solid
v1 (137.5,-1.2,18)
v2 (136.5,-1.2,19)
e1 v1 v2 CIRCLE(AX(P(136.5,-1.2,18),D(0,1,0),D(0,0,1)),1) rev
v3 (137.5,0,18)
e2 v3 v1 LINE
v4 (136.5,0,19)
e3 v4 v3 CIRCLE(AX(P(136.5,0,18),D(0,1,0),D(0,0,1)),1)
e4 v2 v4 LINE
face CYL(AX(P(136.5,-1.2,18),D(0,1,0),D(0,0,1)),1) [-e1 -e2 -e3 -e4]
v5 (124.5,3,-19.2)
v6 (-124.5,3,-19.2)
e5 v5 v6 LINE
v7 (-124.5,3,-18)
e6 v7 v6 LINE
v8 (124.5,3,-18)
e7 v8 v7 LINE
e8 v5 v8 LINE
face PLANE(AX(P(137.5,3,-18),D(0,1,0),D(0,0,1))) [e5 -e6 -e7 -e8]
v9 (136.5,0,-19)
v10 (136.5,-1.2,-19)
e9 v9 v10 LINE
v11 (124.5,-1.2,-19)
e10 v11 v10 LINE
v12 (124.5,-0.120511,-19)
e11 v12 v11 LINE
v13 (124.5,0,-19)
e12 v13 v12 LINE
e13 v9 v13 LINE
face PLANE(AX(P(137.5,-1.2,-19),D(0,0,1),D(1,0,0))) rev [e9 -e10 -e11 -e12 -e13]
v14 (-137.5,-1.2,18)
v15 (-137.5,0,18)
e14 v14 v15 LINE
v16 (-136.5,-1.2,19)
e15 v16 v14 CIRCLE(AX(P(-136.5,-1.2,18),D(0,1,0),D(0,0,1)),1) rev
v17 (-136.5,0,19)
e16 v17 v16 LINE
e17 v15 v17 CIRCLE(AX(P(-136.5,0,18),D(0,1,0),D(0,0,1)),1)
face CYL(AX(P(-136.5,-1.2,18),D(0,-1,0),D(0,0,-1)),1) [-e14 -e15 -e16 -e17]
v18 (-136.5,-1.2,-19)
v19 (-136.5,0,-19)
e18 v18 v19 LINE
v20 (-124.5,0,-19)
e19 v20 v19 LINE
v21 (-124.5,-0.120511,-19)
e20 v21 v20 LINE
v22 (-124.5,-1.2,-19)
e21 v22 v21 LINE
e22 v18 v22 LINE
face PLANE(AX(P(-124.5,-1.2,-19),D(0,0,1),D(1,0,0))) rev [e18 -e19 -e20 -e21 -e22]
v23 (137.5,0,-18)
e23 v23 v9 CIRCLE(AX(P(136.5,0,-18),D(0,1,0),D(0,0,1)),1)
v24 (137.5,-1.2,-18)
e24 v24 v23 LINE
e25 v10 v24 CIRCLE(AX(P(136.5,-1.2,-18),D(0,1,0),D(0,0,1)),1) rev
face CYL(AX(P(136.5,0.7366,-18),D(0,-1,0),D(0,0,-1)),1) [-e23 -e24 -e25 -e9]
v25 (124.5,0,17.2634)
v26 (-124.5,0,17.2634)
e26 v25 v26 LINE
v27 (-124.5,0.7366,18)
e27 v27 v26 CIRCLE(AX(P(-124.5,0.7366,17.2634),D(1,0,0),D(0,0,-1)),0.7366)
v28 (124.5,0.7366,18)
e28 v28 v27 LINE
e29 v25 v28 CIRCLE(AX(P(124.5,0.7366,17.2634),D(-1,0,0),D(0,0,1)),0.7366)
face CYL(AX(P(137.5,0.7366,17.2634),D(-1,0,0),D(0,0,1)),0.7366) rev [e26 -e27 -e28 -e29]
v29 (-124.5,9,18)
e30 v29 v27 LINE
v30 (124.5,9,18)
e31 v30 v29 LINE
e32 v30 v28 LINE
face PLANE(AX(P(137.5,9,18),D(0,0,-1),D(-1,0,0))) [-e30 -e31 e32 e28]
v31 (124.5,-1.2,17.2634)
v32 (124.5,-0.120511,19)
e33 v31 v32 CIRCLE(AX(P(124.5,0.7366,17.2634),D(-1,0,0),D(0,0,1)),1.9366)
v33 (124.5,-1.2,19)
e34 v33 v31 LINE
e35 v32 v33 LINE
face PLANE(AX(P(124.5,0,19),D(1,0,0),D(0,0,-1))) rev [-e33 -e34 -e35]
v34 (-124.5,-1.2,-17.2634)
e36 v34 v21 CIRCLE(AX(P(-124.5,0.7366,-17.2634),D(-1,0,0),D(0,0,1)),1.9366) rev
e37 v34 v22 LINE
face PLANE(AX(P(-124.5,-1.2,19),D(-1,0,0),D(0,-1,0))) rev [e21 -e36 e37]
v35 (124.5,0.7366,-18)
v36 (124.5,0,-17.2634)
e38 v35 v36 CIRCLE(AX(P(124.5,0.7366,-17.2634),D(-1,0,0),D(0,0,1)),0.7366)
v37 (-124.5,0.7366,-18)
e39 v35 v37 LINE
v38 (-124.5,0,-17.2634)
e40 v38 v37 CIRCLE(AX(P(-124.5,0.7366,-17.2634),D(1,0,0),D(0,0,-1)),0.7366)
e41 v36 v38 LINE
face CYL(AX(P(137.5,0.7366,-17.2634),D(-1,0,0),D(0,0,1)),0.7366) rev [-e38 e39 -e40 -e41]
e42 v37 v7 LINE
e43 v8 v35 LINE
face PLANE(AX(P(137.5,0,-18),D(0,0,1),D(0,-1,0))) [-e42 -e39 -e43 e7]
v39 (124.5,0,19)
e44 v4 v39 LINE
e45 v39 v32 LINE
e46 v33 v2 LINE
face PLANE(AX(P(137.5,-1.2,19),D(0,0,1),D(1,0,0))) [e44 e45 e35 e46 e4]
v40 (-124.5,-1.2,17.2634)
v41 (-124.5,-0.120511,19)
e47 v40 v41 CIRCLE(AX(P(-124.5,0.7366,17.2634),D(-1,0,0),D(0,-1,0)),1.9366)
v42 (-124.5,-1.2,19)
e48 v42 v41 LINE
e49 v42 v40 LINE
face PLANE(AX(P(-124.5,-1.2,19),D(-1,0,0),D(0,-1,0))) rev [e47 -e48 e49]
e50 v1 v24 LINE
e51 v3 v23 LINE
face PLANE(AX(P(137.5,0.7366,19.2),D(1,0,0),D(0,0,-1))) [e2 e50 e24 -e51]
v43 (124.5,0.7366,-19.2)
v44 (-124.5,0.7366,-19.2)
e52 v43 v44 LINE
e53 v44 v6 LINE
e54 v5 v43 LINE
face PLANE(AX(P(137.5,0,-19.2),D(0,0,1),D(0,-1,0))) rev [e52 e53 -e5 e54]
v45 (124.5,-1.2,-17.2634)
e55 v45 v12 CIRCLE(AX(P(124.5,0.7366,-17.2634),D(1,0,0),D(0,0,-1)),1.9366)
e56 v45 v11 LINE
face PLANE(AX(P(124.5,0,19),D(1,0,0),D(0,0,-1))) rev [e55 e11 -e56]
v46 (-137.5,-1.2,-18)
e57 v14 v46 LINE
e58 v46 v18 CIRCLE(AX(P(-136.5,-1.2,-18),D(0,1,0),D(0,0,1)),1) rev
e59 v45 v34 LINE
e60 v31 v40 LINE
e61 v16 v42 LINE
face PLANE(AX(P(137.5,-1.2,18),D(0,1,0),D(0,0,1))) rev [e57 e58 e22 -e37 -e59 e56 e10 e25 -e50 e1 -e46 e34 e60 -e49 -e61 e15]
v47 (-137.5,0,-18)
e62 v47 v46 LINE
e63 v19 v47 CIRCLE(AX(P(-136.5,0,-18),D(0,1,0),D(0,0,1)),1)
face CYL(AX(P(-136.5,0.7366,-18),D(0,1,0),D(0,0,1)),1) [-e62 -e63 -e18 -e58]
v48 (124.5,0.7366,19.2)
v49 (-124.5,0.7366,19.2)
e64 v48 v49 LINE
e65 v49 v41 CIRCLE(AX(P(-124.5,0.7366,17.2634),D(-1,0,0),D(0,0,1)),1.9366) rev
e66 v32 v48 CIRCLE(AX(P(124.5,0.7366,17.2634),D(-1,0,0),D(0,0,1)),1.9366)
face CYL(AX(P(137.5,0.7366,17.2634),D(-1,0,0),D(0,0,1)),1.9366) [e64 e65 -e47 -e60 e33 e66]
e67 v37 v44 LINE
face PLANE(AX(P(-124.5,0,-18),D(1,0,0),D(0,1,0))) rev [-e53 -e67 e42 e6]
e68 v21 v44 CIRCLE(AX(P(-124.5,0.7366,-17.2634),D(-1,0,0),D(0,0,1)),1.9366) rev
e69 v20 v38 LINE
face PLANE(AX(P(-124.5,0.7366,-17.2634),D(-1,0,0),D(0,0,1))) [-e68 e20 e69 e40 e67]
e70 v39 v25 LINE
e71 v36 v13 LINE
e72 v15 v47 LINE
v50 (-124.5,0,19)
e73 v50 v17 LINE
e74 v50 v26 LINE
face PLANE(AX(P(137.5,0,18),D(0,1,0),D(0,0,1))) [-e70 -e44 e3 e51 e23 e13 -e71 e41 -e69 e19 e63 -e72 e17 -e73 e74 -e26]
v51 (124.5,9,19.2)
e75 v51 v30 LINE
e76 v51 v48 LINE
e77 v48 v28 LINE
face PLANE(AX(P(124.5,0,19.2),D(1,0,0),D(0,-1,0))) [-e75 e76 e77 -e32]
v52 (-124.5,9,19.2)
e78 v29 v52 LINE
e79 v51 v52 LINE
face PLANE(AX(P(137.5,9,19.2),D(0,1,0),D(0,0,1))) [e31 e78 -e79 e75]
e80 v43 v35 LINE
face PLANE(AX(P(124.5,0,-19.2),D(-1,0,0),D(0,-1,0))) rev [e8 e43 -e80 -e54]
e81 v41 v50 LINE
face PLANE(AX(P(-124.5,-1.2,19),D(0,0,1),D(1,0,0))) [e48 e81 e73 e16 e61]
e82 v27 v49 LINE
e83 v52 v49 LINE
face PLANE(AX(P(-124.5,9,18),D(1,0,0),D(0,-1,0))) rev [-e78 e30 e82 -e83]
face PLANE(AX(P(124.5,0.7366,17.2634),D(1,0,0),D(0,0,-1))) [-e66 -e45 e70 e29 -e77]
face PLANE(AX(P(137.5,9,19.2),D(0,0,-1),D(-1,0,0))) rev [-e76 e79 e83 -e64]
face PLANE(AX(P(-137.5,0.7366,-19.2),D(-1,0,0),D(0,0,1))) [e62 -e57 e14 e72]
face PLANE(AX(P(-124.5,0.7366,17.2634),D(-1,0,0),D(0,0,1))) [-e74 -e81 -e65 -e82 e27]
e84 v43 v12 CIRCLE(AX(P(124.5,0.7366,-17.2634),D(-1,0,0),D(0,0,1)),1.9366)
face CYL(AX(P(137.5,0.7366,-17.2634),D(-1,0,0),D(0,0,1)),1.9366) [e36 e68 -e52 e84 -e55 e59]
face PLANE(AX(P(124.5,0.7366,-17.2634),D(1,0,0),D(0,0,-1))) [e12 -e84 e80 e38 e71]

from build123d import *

# Parameters (mm, degrees)
FLANGE_BASE2_DEPTH       = 137.5
CORTE_EXTRUS_O3_START    = -137.5
CORTE_EXTRUS_O3_DEPTH    = 13
CORTE_EXTRUS_O3_START_2  = 124.5
CORTE_EXTRUS_O3_2_DEPTH  = 13
ESBO_O12_W               = 13
ESBO_O12_H               = 1.2
RESSALTO_EXTRUS_O1_DEPTH = 19
FILETE1_R                = 1


# Read off the part's stored shape, not the designer's step: Corte-extrusão3
# Sheet-metal steps are written as plain solids
with BuildPart() as part:
    # Esboço1 → Flange-base2 (new, symmetric)
    with BuildSketch(Plane(origin=(0, 0, 0), x_dir=(0, 0, -1), z_dir=(1, 0, 0))):
        with BuildLine():
            Line((-18, 9), (-18, 0.7366))
            ThreePointArc((-18, 0.7366), (-17.784254855, 0.215745145), (-17.2634, 0))
            Line((-17.2634, 0), (17.2634, 0))
            ThreePointArc((17.2634, 0), (17.784254855, 0.215745145), (18, 0.7366))
            Line((18, 0.7366), (18, 3))
            Line((18, 3), (19.2, 3))
            Line((19.2, 3), (19.2, 0.7366))
            ThreePointArc((19.2, 0.7366), (18.632782992, -0.632782992), (17.2634, -1.2))
            Line((17.2634, -1.2), (-17.2634, -1.2))
            ThreePointArc((-17.2634, -1.2), (-18.632782992, -0.632782992), (-19.2, 0.7366))
            Line((-19.2, 0.7366), (-19.2, 9))
            Line((-19.2, 9), (-18, 9))
        make_face()
    extrude(amount=FLANGE_BASE2_DEPTH, both=True)

    # Corte-extrusão3 outline → Corte-extrusão3 (cut)
    with BuildSketch(Plane.YZ.offset(CORTE_EXTRUS_O3_START)):
        with BuildLine():
            Line((-1.2, 17.2634), (0, 17.2634))
            ThreePointArc((0, 17.2634), (0.215745145, 17.784254855), (0.7366, 18))
            Line((0.7366, 18), (9, 18))
            Line((9, 18), (9, 19.2))
            Line((9, 19.2), (0.7366, 19.2))
            ThreePointArc((0.7366, 19.2), (-0.632782992, 18.632782992), (-1.2, 17.2634))
        make_face()
        with BuildLine():
            ThreePointArc((0.7366, -18), (0.215745145, -17.784254855), (0, -17.2634))
            Line((0, -17.2634), (-1.2, -17.2634))
            ThreePointArc((-1.2, -17.2634), (-0.632782992, -18.632782992), (0.7366, -19.2))
            Line((0.7366, -19.2), (3, -19.2))
            Line((3, -19.2), (3, -18))
            Line((3, -18), (0.7366, -18))
        make_face()
    extrude(amount=CORTE_EXTRUS_O3_DEPTH, mode=Mode.SUBTRACT)

    # Corte-extrus_o3 2 outline → Corte-extrus_o3 2 (cut)
    with BuildSketch(Plane.YZ.offset(CORTE_EXTRUS_O3_START_2)):
        with BuildLine():
            Line((-1.2, 17.2634), (0, 17.2634))
            ThreePointArc((0, 17.2634), (0.215745145, 17.784254855), (0.7366, 18))
            Line((0.7366, 18), (9, 18))
            Line((9, 18), (9, 19.2))
            Line((9, 19.2), (0.7366, 19.2))
            ThreePointArc((0.7366, 19.2), (-0.632782992, 18.632782992), (-1.2, 17.2634))
        make_face()
        with BuildLine():
            ThreePointArc((0.7366, -18), (0.215745145, -17.784254855), (0, -17.2634))
            Line((0, -17.2634), (-1.2, -17.2634))
            ThreePointArc((-1.2, -17.2634), (-0.632782992, -18.632782992), (0.7366, -19.2))
            Line((0.7366, -19.2), (3, -19.2))
            Line((3, -19.2), (3, -18))
            Line((3, -18), (0.7366, -18))
        make_face()
    extrude(amount=CORTE_EXTRUS_O3_2_DEPTH, mode=Mode.SUBTRACT)

    # Esboço12 → Ressalto-extrusão1 (add, symmetric)
    with BuildSketch(Plane.XY):
        with Locations((131, -0.6)):
            Rectangle(ESBO_O12_W, ESBO_O12_H)
        with Locations((-131, -0.6)):
            Rectangle(ESBO_O12_W, ESBO_O12_H)
    extrude(amount=RESSALTO_EXTRUS_O1_DEPTH, both=True)

    # Filete1
    filete1_edges = [part.edges().sort_by_distance(p)[0] for p in [
        (137.5, -0.6, -19),
        (137.5, -0.6, 19),
        (-137.5, -0.6, -19),
        (-137.5, -0.6, 19),
    ]]
    fillet(filete1_edges, radius=FILETE1_R)


solid = part.part
